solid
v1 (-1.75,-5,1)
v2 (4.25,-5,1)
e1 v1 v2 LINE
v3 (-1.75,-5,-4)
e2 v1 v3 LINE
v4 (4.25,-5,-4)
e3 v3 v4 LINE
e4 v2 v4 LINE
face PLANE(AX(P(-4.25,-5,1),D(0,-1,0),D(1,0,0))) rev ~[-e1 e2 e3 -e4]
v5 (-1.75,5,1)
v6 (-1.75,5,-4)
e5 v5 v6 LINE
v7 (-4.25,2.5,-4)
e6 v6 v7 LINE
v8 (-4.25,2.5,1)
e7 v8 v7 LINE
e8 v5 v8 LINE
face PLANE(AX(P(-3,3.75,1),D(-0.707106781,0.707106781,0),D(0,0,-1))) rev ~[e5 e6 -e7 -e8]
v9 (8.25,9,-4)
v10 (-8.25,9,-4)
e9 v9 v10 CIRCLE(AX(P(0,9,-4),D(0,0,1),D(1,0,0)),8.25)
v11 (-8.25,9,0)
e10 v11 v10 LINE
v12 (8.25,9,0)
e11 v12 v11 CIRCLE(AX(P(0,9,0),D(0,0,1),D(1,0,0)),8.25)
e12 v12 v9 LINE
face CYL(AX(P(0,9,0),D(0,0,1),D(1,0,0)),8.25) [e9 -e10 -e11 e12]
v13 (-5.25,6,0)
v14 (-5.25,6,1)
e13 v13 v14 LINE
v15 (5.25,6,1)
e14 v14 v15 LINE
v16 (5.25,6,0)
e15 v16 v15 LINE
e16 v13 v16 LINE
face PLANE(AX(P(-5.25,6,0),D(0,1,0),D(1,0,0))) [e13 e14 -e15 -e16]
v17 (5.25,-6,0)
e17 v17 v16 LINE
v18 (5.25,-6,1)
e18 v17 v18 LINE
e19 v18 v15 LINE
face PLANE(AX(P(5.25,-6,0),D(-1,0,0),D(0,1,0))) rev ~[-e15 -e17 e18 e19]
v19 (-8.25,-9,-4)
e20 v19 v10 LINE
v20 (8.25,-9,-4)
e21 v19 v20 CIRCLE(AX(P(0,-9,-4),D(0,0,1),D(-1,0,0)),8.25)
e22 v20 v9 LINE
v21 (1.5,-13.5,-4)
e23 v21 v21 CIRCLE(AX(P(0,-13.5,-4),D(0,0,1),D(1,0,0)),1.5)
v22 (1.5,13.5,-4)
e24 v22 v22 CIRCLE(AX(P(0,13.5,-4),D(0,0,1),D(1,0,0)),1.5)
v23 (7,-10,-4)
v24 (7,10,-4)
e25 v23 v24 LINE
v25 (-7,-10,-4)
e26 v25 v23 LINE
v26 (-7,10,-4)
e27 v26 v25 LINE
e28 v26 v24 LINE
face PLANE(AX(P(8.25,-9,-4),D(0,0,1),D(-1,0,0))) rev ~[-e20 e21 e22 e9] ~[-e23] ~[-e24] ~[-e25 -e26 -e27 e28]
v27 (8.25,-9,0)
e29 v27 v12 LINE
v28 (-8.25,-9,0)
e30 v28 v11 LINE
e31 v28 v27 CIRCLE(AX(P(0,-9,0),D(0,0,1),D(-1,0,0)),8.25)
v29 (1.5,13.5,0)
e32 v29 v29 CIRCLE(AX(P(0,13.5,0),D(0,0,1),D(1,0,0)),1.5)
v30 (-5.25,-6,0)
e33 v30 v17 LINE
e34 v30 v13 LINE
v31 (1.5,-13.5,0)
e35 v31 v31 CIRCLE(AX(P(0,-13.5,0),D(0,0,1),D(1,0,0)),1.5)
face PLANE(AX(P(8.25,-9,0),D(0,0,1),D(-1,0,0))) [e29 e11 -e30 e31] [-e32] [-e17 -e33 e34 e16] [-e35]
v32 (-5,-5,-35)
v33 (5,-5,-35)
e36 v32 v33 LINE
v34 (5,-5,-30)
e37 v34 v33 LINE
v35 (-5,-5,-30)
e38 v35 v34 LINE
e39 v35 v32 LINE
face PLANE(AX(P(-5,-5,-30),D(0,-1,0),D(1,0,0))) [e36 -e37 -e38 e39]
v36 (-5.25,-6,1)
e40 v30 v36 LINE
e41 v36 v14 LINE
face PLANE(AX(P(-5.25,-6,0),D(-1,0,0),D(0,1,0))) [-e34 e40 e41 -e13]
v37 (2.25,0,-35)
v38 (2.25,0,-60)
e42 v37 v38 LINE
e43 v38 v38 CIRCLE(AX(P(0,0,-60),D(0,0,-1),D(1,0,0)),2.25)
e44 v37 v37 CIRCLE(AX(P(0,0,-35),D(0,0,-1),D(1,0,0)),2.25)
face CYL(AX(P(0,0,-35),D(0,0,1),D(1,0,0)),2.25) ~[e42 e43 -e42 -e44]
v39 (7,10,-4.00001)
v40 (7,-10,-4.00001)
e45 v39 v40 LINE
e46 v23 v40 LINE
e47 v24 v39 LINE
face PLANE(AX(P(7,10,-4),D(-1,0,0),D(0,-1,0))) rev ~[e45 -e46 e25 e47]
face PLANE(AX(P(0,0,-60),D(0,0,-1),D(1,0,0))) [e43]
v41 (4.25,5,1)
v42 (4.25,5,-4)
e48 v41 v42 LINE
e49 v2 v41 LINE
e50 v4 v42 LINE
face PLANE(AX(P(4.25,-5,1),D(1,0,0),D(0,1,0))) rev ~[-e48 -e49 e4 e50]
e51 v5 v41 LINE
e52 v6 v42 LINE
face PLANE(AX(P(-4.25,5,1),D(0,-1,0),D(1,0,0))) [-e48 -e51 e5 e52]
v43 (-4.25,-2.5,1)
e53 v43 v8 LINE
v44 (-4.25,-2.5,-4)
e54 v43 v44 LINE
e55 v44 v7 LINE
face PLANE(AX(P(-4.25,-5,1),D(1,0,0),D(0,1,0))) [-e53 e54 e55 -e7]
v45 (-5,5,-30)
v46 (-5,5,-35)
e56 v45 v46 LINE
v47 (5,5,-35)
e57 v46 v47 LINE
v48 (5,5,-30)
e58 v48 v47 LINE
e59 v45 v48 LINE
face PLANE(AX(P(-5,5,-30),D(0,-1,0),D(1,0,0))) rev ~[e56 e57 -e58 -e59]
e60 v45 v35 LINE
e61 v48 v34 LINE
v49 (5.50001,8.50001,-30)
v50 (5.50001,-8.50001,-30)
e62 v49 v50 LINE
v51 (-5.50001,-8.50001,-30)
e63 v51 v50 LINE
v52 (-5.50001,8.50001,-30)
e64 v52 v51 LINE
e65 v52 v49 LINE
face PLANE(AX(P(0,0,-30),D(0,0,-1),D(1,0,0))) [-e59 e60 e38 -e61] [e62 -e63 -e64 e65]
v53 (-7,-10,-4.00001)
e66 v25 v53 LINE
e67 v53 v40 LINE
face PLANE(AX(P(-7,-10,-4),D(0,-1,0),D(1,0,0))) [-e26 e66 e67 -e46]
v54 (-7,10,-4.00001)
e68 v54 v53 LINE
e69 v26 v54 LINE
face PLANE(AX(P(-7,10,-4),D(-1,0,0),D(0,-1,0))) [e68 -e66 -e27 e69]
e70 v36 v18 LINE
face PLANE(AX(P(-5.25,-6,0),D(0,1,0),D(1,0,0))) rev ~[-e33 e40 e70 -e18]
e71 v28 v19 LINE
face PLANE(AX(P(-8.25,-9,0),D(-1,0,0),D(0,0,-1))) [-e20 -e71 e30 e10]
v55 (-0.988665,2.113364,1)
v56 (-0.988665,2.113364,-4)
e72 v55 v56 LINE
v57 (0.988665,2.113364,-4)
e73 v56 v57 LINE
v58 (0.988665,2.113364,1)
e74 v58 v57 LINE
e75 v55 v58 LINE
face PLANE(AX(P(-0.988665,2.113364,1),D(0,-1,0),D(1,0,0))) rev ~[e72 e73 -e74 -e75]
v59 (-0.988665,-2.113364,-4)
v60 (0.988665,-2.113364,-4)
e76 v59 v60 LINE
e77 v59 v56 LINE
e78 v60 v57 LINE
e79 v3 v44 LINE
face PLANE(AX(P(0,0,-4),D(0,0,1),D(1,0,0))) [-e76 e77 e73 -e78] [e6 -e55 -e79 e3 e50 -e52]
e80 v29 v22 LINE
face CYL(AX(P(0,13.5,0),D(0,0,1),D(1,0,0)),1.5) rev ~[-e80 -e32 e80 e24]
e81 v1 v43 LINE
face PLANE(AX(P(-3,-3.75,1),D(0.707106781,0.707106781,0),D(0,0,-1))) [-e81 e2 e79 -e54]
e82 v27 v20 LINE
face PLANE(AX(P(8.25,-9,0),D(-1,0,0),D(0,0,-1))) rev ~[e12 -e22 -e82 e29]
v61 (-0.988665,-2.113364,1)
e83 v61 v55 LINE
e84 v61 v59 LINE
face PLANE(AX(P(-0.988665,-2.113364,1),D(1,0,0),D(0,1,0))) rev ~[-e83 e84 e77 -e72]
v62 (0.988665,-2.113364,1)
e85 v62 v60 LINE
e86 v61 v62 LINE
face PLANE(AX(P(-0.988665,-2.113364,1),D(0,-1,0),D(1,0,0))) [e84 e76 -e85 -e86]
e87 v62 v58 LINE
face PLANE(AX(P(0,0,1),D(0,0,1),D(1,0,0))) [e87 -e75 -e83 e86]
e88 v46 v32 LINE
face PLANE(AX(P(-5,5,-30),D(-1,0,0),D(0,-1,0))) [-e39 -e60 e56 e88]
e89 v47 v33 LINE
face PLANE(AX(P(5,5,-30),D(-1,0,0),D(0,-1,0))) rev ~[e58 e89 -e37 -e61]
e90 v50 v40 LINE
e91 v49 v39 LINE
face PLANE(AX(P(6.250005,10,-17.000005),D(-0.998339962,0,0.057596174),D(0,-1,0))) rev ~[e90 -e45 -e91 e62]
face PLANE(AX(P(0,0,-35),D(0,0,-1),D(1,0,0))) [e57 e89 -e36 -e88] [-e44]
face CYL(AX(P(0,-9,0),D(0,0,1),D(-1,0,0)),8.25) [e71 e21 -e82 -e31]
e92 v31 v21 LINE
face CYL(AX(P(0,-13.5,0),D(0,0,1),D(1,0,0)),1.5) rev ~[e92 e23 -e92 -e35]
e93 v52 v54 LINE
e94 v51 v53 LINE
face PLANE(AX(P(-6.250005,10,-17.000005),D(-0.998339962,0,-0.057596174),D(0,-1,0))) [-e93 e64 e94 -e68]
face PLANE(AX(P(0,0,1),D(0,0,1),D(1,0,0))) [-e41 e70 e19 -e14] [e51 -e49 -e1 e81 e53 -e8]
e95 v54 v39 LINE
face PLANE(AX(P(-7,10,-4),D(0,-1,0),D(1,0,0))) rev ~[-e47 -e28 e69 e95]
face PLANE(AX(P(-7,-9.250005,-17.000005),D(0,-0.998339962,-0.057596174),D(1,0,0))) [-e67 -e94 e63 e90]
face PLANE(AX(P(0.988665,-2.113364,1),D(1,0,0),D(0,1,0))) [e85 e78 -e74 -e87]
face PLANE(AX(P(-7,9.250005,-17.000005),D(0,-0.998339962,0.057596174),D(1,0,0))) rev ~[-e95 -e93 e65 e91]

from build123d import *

# Parameters (mm, degrees)
F0_R      = 1.5
F1_DEPTH  = 4
F2_W      = 14
F2_H      = 20
F3_DEPTH  = 26
F4_SIZE2  = 25.99999
F4_SIZE   = 1.49999
F5_W      = 10
F5_H      = 10
F6_DEPTH  = 5
F7_R      = 2.25
F8_DEPTH  = 25
F9_DEPTH  = 18
F10_W     = 10.5
F10_H     = 12
F11_DEPTH = 1
F13_W     = 8.5
F13_H     = 10
F13_W_2   = 1.9773303065
F13_H_2   = 4.2267278768
F14_DEPTH = 5
F15_SIZE  = 2.5


# Not quite as in the source:
# - a fillet or chamfer is up to 0.001 mm smaller than in the source, because OpenCascade refuses the exact size
# - a feature names something its author has since deleted; it is built from what else it names


with BuildPart() as f1:
    # F0 (on Top) → F1 (new body)
    with BuildSketch(Plane.XY):
        with BuildLine():
            Line((-8.25, 9), (8.25, 9))
            ThreePointArc((8.25, 9), (0, 17.25), (-8.25, 9))
        make_face()
        with Locations((0, 13.5)):
            Circle(F0_R, mode=Mode.SUBTRACT)
    extrude(amount=-F1_DEPTH)



with BuildPart() as f1b:
    # F0 (on Top) → F1, piece 2 (new body)
    with BuildSketch(Plane.XY):
        with BuildLine():
            ThreePointArc((-8.25, -9), (0, -17.25), (8.25, -9))
            Line((8.25, -9), (-8.25, -9))
        make_face()
        with Locations((0, -13.5)):
            Circle(F0_R, mode=Mode.SUBTRACT)
    extrude(amount=-F1_DEPTH)


with BuildPart() as f1_1:
    add(f1.part)

    add(f1b.part)  # F3 merges F1b
    # F2 (on face) → F3 (join)
    with BuildSketch(Plane(origin=(0, 0, -4), x_dir=(1, 0, 0), z_dir=(0, 0, -1))):
        Rectangle(F2_W, F2_H)
    extrude(amount=F3_DEPTH)

    # F4 (size 1.5 and 26 in the source; OpenCascade refuses exactly that, so slightly less here)
    f4_edges = [f1_1.edges().sort_by_distance(p)[0] for p in [
        (0, -10, -30),
        (0, 10, -30),
        (7, 0, -30),
        (-7, 0, -30),
    ]]
    f4_side = f1_1.faces().sort_by_distance((0, 0, -30))[0]
    chamfer(f4_edges, length=F4_SIZE, length2=F4_SIZE2, reference=f4_side)

    # F5 (on face) → F6 (join)
    with BuildSketch(Plane(origin=(0, 0, -30), x_dir=(1, 0, 0), z_dir=(0, 0, -1))):
        Rectangle(F5_W, F5_H)
    extrude(amount=F6_DEPTH)

    # F7 (on face) → F8 (join)
    with BuildSketch(Plane(origin=(0, 0, -35), x_dir=(1, 0, 0), z_dir=(0, 0, -1))):
        Circle(F7_R)
    extrude(amount=F8_DEPTH)

    # F9 (add): a face of the model
    f9_faces = [f1_1.faces().sort_by_distance(p)[0] for p in [
        (0, -9, -2),
    ]]
    extrude(f9_faces, amount=F9_DEPTH)

    # F10 (on face) → F11 (join)
    with BuildSketch(Plane.XY):
        Rectangle(F10_W, F10_H)
    extrude(amount=F11_DEPTH)

    # F13 (on face) → F14 (cut)
    with BuildSketch(Plane.XY.offset(1)):
        Rectangle(F13_W, F13_H)
        Rectangle(F13_W_2, F13_H_2, mode=Mode.SUBTRACT)
    extrude(amount=-F14_DEPTH, mode=Mode.SUBTRACT)

    # F15
    f15_edges = [f1_1.edges().sort_by_distance(p)[0] for p in [
        (-4.25, -5, -1.5),
        (-4.25, 5, -1.5),
    ]]
    chamfer(f15_edges, length=F15_SIZE)


solid = f1_1.part
